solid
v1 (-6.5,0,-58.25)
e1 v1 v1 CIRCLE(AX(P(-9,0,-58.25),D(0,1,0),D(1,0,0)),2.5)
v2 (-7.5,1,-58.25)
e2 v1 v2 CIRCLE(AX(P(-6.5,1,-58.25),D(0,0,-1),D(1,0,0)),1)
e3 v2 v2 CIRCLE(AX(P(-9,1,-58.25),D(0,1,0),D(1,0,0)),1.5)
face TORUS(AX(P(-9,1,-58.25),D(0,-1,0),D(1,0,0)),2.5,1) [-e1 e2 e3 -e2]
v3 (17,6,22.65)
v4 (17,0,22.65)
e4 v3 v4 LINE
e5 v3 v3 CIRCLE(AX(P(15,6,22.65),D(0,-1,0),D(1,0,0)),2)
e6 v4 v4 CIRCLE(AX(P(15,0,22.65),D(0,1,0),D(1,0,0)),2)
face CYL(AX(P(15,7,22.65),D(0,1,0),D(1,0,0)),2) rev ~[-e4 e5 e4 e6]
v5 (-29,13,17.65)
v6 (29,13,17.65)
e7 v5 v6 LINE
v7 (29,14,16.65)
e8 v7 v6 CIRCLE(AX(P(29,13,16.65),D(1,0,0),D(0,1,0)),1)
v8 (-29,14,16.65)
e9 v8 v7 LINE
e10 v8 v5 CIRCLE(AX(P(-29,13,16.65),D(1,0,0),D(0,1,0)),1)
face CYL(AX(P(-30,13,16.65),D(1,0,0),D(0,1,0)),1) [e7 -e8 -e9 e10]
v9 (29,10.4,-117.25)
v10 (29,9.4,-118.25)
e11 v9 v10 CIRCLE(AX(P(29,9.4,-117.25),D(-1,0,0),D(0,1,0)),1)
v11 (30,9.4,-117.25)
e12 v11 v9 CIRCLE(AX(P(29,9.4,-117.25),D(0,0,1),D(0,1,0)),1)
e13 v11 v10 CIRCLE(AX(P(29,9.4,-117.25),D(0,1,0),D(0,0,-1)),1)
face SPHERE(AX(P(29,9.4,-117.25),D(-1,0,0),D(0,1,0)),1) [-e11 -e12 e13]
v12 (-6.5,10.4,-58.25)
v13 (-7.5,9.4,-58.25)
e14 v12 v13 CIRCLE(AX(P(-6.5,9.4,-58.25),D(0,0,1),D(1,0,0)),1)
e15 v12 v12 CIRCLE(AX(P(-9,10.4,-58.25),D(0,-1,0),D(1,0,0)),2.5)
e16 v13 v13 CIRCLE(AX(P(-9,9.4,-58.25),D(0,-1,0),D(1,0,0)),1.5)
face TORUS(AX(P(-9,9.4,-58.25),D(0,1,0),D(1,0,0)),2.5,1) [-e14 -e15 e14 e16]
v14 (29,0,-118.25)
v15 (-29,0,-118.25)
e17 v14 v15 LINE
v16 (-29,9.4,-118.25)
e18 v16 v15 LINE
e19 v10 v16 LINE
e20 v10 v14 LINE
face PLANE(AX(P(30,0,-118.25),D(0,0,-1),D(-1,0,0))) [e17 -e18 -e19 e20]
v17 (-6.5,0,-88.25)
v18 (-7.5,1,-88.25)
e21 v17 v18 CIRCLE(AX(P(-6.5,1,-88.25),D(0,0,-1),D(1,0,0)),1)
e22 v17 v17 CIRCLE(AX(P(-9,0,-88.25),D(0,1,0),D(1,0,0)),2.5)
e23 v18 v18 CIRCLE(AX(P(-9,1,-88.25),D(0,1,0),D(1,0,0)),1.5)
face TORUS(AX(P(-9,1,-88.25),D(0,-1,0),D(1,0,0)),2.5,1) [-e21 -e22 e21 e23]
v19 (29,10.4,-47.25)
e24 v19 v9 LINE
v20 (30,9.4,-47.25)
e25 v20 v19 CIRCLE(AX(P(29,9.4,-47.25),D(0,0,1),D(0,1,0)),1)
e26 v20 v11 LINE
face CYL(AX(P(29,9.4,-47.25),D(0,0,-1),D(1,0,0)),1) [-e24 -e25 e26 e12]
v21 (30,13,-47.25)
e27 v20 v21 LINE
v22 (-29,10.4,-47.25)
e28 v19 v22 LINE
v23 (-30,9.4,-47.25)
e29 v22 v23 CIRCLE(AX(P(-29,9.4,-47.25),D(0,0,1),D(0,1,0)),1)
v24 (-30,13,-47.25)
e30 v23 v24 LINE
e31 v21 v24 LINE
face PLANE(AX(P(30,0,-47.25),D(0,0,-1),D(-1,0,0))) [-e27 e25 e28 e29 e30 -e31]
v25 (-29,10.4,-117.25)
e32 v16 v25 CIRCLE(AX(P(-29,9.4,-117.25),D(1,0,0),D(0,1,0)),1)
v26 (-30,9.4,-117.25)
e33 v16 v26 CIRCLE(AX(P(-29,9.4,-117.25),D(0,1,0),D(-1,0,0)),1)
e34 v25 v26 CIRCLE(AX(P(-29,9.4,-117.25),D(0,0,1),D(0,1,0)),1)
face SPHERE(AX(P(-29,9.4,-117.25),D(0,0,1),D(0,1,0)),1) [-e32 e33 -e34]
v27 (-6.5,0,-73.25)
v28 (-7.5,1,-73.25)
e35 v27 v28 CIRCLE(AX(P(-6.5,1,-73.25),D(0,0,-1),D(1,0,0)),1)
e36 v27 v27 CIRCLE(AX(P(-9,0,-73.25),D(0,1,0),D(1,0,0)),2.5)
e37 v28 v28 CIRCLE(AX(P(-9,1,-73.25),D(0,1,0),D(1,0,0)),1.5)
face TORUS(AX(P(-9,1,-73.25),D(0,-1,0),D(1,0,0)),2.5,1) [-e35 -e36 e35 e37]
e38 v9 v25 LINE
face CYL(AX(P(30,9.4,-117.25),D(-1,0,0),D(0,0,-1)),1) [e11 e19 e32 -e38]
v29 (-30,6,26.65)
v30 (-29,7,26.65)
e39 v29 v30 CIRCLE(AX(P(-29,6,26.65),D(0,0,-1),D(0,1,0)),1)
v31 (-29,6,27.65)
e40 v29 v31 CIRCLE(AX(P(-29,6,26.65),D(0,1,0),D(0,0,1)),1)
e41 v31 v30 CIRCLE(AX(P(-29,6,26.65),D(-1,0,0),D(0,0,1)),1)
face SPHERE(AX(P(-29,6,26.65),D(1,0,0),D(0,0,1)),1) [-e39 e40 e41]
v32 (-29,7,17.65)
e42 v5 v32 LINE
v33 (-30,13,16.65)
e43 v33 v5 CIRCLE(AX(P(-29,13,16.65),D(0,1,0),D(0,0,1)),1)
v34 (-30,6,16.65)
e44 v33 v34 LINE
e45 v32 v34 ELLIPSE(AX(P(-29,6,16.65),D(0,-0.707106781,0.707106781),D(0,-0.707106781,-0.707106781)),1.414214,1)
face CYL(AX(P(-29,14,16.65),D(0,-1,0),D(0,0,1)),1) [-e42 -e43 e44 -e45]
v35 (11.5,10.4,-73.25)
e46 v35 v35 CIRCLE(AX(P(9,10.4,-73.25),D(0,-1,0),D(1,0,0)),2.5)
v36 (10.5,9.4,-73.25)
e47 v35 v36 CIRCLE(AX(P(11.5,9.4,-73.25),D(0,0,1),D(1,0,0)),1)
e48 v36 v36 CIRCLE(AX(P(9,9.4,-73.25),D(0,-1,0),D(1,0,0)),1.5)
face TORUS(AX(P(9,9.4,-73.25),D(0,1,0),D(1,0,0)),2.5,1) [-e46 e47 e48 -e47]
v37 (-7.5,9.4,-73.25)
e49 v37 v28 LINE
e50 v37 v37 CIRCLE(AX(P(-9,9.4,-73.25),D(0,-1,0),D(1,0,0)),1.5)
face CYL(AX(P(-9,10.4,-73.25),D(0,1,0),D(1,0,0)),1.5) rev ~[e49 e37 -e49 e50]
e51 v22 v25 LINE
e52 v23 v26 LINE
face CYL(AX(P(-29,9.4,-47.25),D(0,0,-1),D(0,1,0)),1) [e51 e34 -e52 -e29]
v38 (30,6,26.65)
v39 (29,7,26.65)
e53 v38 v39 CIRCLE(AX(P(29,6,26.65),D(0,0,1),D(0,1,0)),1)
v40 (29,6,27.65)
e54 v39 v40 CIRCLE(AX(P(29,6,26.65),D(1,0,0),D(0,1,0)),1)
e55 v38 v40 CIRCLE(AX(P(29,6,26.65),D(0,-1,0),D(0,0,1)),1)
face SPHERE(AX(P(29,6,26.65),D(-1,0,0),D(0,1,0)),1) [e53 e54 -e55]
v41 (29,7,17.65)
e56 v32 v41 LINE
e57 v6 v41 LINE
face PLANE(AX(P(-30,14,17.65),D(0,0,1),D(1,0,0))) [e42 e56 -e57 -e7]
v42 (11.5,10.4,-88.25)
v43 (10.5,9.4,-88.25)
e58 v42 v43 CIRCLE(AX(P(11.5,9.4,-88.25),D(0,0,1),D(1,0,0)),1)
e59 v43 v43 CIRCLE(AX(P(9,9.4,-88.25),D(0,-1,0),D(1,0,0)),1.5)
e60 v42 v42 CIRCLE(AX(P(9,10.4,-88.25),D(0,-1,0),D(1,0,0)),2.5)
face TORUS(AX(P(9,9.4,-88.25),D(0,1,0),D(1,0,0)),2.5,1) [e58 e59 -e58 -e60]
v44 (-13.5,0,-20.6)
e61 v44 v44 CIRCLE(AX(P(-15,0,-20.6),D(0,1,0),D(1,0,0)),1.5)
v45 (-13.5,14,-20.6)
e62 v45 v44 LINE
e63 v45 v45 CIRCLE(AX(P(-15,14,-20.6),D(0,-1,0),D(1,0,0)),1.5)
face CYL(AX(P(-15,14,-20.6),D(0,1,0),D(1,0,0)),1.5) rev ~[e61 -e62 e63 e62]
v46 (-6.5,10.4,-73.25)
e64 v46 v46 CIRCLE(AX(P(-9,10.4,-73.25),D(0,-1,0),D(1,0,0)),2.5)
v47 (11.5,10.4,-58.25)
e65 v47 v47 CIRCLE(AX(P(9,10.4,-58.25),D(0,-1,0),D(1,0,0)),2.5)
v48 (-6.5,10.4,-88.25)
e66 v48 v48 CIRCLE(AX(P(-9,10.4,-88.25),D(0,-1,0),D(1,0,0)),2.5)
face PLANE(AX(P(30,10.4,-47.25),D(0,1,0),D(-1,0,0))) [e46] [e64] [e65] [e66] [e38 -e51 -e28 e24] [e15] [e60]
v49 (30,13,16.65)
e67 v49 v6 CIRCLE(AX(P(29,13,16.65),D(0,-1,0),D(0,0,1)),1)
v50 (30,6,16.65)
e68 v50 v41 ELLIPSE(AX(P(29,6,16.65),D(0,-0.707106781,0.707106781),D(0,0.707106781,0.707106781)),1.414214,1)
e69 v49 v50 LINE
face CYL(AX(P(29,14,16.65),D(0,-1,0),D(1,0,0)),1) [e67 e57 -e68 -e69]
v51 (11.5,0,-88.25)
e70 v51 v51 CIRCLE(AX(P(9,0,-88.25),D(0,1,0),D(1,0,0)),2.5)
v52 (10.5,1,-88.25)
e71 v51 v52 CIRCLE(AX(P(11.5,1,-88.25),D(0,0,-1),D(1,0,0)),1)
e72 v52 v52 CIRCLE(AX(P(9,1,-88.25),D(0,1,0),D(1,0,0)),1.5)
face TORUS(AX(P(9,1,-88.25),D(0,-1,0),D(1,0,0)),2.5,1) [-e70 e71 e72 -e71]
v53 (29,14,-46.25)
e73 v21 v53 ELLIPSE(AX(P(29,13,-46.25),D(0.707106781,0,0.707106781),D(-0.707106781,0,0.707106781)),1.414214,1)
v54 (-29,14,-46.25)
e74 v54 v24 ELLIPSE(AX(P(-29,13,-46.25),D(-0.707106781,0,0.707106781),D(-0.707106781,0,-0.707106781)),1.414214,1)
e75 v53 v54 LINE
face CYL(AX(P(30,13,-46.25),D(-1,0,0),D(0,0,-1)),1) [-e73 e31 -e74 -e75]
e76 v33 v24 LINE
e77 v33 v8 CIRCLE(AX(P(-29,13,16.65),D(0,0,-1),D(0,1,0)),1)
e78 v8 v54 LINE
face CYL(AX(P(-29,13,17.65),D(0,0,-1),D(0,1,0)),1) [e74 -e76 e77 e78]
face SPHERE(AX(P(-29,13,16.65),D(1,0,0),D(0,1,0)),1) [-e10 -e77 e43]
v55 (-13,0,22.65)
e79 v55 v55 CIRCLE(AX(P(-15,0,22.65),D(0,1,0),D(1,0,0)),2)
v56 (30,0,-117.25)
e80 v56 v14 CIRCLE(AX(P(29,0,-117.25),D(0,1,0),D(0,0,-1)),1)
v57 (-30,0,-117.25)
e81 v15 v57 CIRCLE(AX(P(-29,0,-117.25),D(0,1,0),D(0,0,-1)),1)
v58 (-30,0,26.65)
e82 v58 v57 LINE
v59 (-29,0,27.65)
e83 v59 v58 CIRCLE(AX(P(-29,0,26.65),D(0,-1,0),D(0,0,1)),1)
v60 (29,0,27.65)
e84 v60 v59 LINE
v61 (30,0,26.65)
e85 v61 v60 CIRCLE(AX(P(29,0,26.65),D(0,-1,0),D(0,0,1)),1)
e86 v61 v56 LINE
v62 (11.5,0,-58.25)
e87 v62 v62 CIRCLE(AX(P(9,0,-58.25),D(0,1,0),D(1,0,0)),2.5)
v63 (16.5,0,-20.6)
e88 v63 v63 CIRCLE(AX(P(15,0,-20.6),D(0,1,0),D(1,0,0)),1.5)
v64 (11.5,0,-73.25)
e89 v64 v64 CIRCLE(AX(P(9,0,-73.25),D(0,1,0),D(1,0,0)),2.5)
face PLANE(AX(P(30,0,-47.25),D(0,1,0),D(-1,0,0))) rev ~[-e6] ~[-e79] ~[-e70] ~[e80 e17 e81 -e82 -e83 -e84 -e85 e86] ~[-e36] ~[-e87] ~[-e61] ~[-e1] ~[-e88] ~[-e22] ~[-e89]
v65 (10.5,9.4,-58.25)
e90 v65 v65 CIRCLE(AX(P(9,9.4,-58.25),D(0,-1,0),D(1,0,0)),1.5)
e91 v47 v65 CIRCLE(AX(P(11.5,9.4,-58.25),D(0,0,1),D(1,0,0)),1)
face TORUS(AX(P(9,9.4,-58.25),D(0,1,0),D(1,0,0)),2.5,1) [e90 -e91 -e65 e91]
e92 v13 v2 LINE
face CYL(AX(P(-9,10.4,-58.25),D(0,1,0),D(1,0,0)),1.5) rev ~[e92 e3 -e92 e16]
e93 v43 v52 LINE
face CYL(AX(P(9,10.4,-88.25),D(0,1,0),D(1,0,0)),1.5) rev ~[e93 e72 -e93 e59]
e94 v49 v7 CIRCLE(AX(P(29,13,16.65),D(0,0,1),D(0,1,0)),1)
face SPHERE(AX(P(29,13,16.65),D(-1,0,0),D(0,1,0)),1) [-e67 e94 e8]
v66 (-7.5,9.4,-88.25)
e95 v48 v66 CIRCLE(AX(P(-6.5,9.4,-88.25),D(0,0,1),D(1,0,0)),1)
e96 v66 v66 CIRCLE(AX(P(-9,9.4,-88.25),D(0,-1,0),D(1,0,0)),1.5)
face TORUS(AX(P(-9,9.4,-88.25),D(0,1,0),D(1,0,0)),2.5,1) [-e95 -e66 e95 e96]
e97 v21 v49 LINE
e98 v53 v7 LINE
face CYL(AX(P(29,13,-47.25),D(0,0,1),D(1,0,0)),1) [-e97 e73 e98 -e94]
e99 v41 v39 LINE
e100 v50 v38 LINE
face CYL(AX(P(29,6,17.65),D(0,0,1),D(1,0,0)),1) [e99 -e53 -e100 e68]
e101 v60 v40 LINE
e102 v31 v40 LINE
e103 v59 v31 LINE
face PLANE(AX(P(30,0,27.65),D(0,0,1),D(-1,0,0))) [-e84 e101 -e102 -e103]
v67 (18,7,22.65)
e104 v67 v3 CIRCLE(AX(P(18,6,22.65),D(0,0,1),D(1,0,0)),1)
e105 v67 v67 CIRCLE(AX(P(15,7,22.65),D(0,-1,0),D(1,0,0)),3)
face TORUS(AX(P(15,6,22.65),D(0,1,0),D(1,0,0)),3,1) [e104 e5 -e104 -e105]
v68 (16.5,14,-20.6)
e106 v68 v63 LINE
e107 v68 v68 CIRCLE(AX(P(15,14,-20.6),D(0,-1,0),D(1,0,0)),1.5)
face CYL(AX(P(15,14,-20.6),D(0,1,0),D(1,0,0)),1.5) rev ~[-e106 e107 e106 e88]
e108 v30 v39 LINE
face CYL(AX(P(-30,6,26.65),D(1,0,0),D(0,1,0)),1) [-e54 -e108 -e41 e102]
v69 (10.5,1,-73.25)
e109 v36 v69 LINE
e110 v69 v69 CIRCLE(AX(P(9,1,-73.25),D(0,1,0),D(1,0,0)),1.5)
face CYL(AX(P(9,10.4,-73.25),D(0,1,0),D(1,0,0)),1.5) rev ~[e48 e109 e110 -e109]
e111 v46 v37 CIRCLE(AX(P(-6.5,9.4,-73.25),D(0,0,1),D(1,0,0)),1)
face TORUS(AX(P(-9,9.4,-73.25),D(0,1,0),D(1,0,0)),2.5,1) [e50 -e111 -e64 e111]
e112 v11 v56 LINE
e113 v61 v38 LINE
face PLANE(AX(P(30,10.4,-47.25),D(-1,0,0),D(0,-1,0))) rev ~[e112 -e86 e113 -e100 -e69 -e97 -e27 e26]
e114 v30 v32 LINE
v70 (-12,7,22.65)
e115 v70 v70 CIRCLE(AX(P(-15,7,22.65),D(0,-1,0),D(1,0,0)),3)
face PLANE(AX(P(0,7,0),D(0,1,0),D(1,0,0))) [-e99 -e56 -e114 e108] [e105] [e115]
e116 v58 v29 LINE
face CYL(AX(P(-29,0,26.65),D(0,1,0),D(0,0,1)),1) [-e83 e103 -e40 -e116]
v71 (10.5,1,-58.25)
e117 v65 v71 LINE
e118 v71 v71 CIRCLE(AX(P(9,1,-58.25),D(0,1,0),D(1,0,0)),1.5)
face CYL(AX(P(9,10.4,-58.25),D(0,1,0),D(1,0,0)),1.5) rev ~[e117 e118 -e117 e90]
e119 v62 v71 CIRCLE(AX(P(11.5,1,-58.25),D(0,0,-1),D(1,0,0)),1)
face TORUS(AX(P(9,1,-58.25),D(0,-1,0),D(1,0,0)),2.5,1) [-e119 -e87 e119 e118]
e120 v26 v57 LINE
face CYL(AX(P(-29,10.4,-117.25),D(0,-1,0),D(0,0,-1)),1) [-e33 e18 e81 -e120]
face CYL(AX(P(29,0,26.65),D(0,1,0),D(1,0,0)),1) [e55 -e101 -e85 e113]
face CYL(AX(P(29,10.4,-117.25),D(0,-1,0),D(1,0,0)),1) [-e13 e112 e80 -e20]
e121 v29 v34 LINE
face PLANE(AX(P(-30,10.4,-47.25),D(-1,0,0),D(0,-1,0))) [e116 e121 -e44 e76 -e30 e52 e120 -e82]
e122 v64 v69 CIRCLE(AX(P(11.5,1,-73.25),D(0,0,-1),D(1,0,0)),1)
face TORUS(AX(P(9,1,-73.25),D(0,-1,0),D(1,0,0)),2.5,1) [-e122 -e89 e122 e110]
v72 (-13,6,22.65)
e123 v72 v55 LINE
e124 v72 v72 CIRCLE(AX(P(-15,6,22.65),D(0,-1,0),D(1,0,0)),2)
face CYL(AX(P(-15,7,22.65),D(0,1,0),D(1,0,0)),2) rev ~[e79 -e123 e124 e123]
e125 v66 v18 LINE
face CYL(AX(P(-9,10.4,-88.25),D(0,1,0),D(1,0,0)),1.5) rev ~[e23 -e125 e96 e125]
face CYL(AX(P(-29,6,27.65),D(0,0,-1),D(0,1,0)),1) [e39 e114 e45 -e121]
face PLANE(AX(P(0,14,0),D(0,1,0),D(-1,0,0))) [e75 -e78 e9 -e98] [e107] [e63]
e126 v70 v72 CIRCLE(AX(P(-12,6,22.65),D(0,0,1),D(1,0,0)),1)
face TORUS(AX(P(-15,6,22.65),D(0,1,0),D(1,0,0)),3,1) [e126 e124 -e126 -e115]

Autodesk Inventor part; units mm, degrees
ref_plane "YZ Plane" through (0, 0, 0) normal (1, 0, 0) x (0, 1, 0)
ref_plane "XZ Plane" through (0, 0, 0) normal (0, 1, 0) x (-1, 0, 0)
ref_plane "XY Plane" through (0, 0, 0) normal (0, 0, 1) x (1, 0, 0)
sketch "Esquisse1" plane through (0, 0, 0) normal (0, 1, 0) x (-1, 0, 0)
  line L0 (-30, 27.65) -> (30, 27.65)
  line L1 (30, 27.65) -> (30, -27.65)
  line L2 (30, -27.65) -> (-30, -27.65)
  line L3 (-30, -27.65) -> (-30, 27.65)
  line L4 (-30, 27.65) -> (30, -27.65) construction
  line L5 (30, 27.65) -> (-30, -27.65) construction
  point P0 (0, 0)
  dimension "d0" = 60
  dimension "d10" = 55.3
extrude "Extrusion1" add sketch "Esquisse1" along normal blind 14
sketch "Esquisse2" plane through (0, 14, 0) normal (0, 1, 0) x (1, 0, 0)
  line L0 (30, -27.65) -> (30, 27.65) projected
  line L1 (-30, -27.65) -> (30, -27.65)
  line L2 (-30, 27.65) -> (-30, -27.65) projected
  line L3 (-30, 27.65) -> (30, 27.65)
  line L4 (30, 27.65) -> (30, 13.55)
  line L5 (30, 13.55) -> (-30, 13.55)
  line L6 (-30, 13.55) -> (-30, 27.65)
  line L7 (-30, 20.6) -> (30, 20.6)
  circle A0 centre (-15, 20.6) radius 1.5
  circle A1 centre (15, 20.6) radius 1.5
  point P0 (0, 0)
  point P1 (-30, 13.55)
  dimension "d29" = 14.1
  dimension "d40" = 15
  dimension "d41" = 15
  dimension "d42" = 3
extrude "Extrusion2" [suppressed]
sketch "Esquisse5" plane through (30, 0, -27.65) normal (0, 0, -1) x (-1, 0, 0)
  line L0 (60, 0) -> (0, 0)
  line L1 (0, 0) -> (0, 14)
  line L2 (0, 14) -> (60, 14)
  line L3 (60, 14) -> (60, 0)
  point P0 (30, 0)
extrude "Extrusion4" add sketch "Esquisse5" along normal blind 19.6
sketch "Esquisse6" plane through (30, 0, -47.25) normal (0, 0, -1) x (-1, 0, 0)
  line L0 (0, 0) -> (60, 0) projected
  line L1 (0, 14) -> (0, 0) projected
  line L2 (60, 0) -> (0, 0)
  line L3 (0, 0) -> (0, 10.4)
  line L4 (0, 10.4) -> (60, 10.4)
  line L5 (60, 10.4) -> (60, 0)
  point P0 (30, 0)
  point P1 (0, 15)
  dimension "d17" = 10.4
extrude "Extrusion5" add sketch "Esquisse6" along normal blind 71
sketch "Esquisse7" plane through (-30, 10.4, -47.25) normal (0, 1, 0) x (1, 0, 0)
  line L0 (0, -74.9) -> (0, 0) projected
  line L1 (0, 71) -> (60, 71) projected
  line L2 (0, 0) -> (60, 0)
  line L3 (60, 0) -> (60, 71)
  line L4 (60, 71) -> (0, 71)
  line L5 (0, 71) -> (0, 0)
  line L6 (21, 11) -> (39, 11)
  line L7 (39, 11) -> (39, 41)
  line L8 (39, 41) -> (21, 41)
  line L9 (21, 41) -> (21, 11)
  line L10 (21, 11) -> (39, 41) construction
  line L11 (39, 11) -> (21, 41) construction
  line L12 (30, 71) -> (30, 0)
  line L13 (39, 26) -> (21, 26)
  circle A0 centre (39, 11) radius 1.5
  circle A1 centre (21, 11) radius 1.5
  circle A2 centre (21, 26) radius 1.5
  circle A3 centre (39, 26) radius 1.5
  circle A4 centre (39, 41) radius 1.5
  circle A5 centre (21, 41) radius 1.5
  point P0 (30, -47.25)
  point P1 (0, -19.6)
  point P2 (30, 26)
  dimension "d20" = 18
  dimension "d21" = 11
  dimension "d22" = 30
  dimension "d23" = 3
extrude "Extrusion6" cut sketch "Esquisse7" against normal through all contours A4 L7 L8 | L8 L7 A4 | A5 L9 L8 | L8 L9 A5 | A3 L7 L13 | L13 L7 A3 | A2 L9 L13 | L13 L9 A2 | A1 L9 L6 | L6 L9 A1 | A0 L7 L6 | L6 L7 A0 | A3 L7 | L9 A2
sketch "Esquisse9" plane through (0, 14, 0) normal (0, 1, 0) x (1, 0, 0)
  line L0 (-30, -27.65) -> (30, -27.65) projected
  line L1 (-30, -27.65) -> (-30, 118.25) projected
  line L2 (30, -27.65) -> (-30, -27.65)
  line L3 (-30, -27.65) -> (-30, -17.65)
  line L4 (-30, -17.65) -> (30, -17.65)
  line L5 (30, -17.65) -> (30, -27.65)
  point P0 (0, 0)
  dimension "d30" = 10
extrude "Extrusion8" cut sketch "Esquisse9" against normal blind 7
sketch "Esquisse10" plane through (0, 7, 0) normal (0, 1, 0) x (1, 0, 0)
  line L0 (-30, -27.65) -> (-30, -17.65) projected
  line L1 (-30, -17.65) -> (30, -17.65) projected
  line L2 (-30, -27.65) -> (30, -27.65)
  line L3 (30, -27.65) -> (30, -17.65)
  line L4 (30, -17.65) -> (-30, -17.65)
  line L5 (-30, -17.65) -> (-30, -27.65)
  line L6 (-30, -22.65) -> (30, -22.65)
  circle A0 centre (15, -22.65) radius 2
  circle A1 centre (-15, -22.65) radius 2
  line L7 (30, -17.65) -> (30, -27.65) projected
  point P0 (0, 0)
  point P1 (0, -22.65)
  point P2 (-30, -22.65)
  dimension "d33" = 30
  dimension "d34" = 15
  dimension "d35" = 15
  dimension "d36" = 4
extrude "Extrusion9" cut sketch "Esquisse10" against normal through all contours A1 L6 | L6 A1 | A0 L6 | L6 A0
fillet "Congé1" radius 1 30 edges at (0, 14, 17.65) (0, 7, 27.65) (30, 14, -14.8) (-30, 14, -14.8) (-30, 10.4, -82.75) (0, 10.4, -118.25) (-30, 5.2, -118.25) (-30, 3.5, 27.65) (30, 7, 22.65) (-30, 7, 22.65) (30, 3.5, 27.65) (30, 10.5, 17.65) (-30, 10.5, 17.65) (30, 10.4, -82.75) (30, 5.2, -118.25) (0, 14, -47.25) (7.5, 10.4, -58.25) (-10.5, 10.4, -58.25) (-10.5, 10.4, -73.25) (7.5, 10.4, -73.25) (7.5, 10.4, -88.25) (-10.5, 10.4, -88.25) (13, 7, 22.65) (-17, 7, 22.65) (7.5, 0, -58.25) (7.5, 0, -73.25) (7.5, 0, -88.25) (-10.5, 0, -88.25) (-10.5, 0, -73.25) (-10.5, 0, -58.25)
extrude "Extrusion10" cut sketch "Esquisse2" against normal through all contours A1 L7 | L7 A1 | A0 L7 | L7 A0
properties part number "cadre"
